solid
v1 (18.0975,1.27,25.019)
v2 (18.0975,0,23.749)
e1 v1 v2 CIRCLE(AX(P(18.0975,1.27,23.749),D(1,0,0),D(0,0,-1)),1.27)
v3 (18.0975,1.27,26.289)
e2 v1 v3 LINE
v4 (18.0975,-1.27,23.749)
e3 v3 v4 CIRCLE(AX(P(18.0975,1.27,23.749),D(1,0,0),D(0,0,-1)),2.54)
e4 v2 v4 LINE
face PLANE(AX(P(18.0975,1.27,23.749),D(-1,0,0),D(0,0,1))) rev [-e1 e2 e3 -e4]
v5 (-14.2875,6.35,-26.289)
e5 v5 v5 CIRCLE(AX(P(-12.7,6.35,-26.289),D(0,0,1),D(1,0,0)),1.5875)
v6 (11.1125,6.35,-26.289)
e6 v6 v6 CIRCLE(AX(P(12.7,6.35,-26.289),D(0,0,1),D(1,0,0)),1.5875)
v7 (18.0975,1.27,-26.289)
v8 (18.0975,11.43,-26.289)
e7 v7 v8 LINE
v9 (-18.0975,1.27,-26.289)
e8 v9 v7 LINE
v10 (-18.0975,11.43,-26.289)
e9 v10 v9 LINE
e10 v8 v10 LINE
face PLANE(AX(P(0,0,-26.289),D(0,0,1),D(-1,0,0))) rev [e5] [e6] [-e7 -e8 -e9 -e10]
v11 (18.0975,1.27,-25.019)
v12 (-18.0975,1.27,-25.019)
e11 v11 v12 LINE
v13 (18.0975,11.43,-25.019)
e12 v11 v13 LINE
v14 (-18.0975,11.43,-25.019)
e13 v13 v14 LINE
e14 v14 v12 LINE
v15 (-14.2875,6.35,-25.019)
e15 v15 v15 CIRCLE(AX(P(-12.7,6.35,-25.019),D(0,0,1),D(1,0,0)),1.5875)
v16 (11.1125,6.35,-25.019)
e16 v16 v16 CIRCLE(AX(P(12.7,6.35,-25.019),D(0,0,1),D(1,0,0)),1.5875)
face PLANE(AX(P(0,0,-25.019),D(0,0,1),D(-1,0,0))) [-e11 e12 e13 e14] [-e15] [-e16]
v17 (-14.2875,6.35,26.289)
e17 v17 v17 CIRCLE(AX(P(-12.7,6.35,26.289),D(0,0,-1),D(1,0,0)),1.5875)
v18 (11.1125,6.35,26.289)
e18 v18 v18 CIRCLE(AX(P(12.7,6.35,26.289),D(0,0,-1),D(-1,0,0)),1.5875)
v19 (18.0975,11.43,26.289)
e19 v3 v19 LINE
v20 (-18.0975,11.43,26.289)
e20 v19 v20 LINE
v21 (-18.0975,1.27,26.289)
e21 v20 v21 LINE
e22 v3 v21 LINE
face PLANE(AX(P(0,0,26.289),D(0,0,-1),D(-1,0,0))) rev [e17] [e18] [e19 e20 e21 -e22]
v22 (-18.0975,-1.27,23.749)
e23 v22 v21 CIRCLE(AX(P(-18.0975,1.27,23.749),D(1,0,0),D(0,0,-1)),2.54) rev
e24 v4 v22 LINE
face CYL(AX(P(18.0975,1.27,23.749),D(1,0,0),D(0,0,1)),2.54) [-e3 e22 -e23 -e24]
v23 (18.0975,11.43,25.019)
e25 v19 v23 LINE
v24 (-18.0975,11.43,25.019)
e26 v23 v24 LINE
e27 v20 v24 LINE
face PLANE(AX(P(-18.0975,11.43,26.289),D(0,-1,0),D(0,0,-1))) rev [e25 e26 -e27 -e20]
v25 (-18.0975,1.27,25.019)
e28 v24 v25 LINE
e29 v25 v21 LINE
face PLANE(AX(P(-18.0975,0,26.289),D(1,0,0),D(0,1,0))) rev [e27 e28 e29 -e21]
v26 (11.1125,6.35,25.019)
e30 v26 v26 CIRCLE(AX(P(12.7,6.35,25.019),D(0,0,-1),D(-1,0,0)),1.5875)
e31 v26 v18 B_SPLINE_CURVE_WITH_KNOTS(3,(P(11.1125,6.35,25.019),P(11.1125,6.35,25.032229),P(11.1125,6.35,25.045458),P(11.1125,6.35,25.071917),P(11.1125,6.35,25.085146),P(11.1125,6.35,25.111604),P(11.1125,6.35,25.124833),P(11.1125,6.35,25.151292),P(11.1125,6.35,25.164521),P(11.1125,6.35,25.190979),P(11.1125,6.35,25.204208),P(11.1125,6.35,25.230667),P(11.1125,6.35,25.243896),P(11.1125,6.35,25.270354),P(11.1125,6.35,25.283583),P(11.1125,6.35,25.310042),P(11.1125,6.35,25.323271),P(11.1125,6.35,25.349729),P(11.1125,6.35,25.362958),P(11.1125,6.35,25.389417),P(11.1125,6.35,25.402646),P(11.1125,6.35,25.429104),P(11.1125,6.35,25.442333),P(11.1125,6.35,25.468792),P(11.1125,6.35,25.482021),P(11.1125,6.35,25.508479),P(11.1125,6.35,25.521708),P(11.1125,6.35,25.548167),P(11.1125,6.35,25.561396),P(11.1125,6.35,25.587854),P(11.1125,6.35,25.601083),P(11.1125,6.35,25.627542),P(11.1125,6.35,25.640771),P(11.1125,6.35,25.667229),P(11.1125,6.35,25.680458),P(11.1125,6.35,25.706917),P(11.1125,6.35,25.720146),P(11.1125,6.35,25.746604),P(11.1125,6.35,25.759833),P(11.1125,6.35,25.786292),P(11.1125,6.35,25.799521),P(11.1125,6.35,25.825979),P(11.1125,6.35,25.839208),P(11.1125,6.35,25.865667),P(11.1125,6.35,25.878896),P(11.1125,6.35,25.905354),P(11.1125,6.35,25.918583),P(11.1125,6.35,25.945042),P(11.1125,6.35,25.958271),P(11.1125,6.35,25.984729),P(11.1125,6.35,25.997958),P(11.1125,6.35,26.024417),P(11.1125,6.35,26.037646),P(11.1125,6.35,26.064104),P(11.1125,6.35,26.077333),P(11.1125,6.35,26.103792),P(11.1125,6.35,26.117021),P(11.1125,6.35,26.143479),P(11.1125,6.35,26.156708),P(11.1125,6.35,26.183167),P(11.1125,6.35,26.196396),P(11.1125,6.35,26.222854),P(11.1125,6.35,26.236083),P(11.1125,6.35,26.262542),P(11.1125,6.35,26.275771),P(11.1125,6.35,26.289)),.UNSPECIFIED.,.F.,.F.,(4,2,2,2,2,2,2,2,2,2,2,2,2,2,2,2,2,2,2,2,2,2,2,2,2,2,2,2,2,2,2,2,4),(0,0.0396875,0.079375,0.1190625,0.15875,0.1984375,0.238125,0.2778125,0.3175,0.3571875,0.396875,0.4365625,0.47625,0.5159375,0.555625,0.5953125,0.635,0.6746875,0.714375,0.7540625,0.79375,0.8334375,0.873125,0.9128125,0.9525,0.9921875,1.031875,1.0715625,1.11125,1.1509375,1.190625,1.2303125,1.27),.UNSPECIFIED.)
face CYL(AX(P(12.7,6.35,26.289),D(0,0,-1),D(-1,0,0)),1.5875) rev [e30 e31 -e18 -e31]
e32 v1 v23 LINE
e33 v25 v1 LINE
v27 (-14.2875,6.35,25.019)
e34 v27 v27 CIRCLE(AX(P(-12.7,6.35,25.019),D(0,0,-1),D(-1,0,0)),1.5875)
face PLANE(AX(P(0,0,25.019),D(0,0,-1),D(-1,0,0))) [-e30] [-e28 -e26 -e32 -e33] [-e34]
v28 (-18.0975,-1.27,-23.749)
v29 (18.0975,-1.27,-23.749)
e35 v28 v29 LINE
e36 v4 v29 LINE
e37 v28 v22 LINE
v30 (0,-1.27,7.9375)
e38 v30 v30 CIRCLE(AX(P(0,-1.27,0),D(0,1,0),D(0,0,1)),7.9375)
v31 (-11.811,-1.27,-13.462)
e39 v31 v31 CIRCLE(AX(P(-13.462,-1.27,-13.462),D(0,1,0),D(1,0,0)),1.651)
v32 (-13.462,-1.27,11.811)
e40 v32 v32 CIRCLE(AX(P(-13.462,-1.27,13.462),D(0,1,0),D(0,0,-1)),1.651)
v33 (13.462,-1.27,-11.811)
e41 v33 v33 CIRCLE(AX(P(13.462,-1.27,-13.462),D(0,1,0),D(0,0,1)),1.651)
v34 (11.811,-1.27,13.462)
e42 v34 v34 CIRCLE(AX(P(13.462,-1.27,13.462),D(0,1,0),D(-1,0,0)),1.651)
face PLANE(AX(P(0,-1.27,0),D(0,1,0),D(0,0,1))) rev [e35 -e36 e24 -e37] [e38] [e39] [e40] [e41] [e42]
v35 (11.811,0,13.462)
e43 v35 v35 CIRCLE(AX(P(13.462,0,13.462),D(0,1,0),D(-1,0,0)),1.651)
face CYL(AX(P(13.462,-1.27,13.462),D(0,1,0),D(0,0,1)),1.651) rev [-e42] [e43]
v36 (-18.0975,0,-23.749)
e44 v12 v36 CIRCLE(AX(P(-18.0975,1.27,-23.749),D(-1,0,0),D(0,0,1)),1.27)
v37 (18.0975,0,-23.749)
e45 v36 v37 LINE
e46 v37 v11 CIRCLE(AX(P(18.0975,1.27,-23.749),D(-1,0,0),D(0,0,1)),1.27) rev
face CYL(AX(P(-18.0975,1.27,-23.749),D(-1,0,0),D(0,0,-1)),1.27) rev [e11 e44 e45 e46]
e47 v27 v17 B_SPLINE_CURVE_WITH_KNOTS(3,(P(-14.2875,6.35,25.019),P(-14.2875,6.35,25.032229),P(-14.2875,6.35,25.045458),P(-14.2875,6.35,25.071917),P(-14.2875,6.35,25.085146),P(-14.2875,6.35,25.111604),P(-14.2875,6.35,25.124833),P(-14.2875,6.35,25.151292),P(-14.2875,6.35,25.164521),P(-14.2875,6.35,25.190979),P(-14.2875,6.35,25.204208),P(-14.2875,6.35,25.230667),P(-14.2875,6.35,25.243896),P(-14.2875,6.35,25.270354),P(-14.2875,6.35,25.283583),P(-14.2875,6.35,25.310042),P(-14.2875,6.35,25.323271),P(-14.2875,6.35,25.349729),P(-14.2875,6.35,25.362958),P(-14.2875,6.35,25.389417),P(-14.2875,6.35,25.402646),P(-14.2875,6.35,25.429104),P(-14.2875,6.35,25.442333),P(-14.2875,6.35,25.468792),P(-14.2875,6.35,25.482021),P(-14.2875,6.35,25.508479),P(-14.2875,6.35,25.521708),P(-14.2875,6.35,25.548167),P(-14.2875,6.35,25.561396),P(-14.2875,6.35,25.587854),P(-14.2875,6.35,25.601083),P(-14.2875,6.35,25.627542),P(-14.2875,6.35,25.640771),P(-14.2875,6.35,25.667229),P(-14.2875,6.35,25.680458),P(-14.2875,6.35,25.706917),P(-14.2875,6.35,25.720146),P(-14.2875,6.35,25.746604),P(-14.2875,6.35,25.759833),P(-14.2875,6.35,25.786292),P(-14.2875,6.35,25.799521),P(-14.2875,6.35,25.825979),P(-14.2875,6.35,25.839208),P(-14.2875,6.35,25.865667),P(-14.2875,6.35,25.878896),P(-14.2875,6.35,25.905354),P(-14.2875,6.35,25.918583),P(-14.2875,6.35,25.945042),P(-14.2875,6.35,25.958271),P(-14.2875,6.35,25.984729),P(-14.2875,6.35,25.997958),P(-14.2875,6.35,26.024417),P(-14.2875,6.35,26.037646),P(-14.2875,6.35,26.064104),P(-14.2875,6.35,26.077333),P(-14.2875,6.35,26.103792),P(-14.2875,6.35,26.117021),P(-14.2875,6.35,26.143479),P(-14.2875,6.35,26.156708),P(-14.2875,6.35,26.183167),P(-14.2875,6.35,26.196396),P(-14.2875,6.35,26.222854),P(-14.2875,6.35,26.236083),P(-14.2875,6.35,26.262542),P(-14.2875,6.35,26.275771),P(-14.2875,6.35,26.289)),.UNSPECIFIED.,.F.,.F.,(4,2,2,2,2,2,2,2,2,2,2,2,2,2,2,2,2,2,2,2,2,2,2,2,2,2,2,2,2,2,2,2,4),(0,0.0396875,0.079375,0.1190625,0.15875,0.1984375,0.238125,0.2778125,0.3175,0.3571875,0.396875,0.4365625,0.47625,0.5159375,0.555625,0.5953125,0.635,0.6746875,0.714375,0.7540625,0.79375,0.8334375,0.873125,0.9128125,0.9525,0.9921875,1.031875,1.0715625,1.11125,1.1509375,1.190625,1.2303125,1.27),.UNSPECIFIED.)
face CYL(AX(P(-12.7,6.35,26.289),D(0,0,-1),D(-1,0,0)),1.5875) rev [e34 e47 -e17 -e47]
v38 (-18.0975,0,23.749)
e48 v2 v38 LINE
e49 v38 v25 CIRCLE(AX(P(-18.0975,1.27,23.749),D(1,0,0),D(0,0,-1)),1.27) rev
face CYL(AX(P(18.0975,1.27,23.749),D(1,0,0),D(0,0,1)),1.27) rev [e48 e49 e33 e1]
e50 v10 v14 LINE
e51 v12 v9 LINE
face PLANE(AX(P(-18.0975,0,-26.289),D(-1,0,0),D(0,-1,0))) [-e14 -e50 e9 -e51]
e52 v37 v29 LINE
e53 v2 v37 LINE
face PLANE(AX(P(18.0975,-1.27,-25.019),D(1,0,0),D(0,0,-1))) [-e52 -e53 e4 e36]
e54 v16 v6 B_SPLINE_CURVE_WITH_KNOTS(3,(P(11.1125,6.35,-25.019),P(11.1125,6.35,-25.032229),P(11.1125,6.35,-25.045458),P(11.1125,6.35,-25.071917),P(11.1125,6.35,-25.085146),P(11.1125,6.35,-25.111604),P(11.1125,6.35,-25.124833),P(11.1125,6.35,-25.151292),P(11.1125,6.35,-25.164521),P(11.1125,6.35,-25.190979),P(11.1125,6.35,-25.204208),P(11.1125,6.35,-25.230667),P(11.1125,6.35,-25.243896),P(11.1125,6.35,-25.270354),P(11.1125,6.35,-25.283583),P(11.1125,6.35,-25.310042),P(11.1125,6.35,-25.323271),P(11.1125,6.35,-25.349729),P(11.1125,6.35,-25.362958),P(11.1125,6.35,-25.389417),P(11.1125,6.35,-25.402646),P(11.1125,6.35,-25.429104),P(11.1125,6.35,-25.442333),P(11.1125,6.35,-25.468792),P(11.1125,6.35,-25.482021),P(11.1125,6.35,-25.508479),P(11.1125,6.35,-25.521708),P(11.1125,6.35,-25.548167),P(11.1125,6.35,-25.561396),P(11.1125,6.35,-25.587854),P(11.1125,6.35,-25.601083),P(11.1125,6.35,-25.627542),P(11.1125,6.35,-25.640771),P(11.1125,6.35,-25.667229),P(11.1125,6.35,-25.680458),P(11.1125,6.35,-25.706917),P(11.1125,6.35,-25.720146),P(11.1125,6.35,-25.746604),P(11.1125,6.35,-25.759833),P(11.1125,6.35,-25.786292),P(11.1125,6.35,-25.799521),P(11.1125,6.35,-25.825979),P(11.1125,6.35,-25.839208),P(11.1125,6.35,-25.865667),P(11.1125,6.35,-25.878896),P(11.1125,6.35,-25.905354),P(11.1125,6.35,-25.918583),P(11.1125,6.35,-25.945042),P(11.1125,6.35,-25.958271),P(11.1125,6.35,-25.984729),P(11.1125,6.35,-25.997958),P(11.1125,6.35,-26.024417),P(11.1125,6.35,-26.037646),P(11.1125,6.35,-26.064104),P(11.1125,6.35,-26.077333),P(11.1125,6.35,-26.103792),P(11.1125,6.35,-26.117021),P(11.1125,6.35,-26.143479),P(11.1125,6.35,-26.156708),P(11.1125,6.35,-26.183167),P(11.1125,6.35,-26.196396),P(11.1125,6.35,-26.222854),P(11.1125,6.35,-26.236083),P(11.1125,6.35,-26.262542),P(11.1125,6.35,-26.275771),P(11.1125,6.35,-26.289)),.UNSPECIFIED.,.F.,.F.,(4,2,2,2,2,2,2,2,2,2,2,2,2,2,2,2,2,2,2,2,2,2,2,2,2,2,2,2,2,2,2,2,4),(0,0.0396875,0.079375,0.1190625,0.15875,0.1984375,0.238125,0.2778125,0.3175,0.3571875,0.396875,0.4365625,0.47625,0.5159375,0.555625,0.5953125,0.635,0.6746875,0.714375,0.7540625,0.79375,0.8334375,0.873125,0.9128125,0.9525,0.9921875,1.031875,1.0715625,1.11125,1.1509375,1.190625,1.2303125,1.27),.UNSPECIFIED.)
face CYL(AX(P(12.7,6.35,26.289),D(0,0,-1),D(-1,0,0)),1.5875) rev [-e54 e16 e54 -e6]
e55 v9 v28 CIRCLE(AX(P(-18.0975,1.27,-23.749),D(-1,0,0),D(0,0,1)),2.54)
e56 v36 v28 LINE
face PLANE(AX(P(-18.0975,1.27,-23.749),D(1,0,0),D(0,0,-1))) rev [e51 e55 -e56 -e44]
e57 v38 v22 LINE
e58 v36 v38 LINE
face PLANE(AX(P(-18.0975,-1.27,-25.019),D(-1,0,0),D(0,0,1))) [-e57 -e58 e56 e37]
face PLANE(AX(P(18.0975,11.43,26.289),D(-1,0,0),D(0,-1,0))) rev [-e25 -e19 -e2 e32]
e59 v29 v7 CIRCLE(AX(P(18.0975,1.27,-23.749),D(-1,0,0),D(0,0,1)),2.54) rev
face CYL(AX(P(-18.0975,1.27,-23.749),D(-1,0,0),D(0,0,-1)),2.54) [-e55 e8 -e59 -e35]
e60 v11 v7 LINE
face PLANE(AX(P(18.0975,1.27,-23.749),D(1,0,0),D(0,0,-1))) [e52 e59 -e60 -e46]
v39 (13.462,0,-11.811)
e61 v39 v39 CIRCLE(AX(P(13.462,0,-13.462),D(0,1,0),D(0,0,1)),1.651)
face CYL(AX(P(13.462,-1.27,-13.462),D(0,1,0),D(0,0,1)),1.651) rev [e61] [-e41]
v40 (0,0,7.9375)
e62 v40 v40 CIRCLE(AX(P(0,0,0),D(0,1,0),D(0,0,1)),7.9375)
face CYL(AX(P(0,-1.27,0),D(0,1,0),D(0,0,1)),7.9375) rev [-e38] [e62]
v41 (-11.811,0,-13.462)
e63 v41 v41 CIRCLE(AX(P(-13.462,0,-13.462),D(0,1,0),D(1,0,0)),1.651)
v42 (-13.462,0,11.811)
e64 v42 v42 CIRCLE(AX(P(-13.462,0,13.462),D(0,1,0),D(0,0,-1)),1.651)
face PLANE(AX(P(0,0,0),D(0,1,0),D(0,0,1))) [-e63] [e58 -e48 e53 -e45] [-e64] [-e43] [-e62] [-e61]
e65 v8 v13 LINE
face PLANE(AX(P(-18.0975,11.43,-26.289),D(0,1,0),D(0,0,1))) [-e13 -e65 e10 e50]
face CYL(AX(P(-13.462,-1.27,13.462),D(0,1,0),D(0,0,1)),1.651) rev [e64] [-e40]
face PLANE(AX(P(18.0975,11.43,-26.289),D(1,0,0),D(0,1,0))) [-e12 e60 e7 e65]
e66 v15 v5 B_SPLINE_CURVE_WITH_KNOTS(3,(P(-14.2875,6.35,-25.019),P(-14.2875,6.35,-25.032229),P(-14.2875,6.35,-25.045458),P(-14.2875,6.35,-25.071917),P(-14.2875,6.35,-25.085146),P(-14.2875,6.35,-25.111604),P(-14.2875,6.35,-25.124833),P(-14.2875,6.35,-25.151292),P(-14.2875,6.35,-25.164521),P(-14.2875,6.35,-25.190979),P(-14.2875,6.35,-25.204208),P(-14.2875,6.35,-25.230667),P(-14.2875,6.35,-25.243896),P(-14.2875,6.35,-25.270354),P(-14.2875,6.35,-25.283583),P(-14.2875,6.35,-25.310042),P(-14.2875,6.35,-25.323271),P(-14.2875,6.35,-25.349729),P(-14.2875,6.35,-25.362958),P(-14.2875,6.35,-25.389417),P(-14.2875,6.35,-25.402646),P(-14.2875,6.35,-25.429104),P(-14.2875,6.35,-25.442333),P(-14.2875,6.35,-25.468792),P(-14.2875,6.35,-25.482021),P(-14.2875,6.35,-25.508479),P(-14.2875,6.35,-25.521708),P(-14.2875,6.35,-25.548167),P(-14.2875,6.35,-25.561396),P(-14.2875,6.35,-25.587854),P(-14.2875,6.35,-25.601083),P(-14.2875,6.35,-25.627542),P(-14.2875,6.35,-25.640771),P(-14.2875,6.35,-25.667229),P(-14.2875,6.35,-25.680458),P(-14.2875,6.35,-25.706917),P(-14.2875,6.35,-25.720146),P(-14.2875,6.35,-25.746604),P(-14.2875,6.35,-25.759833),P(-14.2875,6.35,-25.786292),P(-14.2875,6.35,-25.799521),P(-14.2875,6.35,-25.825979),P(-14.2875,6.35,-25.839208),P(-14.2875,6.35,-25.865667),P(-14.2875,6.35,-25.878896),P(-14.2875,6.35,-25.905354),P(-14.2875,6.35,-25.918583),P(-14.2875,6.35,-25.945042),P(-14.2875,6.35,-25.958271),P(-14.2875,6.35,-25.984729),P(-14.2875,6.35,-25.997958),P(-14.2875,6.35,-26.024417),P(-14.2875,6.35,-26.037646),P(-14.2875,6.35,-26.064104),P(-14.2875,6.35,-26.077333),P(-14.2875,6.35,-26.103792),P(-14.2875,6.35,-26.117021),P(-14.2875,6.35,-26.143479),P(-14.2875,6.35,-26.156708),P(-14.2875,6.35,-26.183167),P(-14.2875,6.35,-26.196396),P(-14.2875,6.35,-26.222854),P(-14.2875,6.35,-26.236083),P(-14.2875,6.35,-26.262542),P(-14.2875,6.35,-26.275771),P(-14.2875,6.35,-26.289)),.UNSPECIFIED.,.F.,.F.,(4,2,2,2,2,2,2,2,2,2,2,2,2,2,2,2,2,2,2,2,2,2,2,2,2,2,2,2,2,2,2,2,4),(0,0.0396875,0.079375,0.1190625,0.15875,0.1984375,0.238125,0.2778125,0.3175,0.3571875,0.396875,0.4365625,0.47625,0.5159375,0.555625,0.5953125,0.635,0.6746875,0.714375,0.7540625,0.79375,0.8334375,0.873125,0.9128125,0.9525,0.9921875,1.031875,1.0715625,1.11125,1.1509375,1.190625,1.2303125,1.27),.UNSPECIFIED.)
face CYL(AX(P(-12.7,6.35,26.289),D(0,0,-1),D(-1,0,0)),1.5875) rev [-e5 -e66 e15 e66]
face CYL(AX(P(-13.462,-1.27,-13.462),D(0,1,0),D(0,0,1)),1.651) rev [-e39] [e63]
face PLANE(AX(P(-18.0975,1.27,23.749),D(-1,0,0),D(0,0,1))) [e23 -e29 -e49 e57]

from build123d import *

# Parameters (mm, degrees)
SKETCH1_W                    = 36.195
SKETCH1_H                    = 50.038
SKETCH1_R                    = 7.9375
BASE_FLANGE1_DEPTH           = 1.27
EDGE_FLANGE1_STRIP_W         = 7.62
EDGE_FLANGE1_STRIP_H         = 1.27
EDGE_FLANGE1_STRIP_CUT_DEPTH = 36.195
EDGE_FLANGE1_DEPTH           = 36.195
SKETCH9_R                    = 1.651
CUT_EXTRUDE1_DEPTH           = 34.900972364
CUT_EXTRUDE2_DEPTH           = 57.768041099
CUT_EXTRUDE2_DEPTH_BACK      = 57.768041099
SKETCH10_R                   = 1.5875
CIRPATTERN2_COUNT            = 4


# Sheet-metal steps are written as plain solids
with BuildPart() as part:
    # Sketch1 → Base-Flange1 (new body)
    with BuildSketch(Plane(origin=(0, 0, 0), x_dir=(1, 0, 0), z_dir=(0, 1, 0))):
        Rectangle(SKETCH1_W, SKETCH1_H)
        with Locations(Location((0, 0, 0), (0, 0, 270))):
            Circle(SKETCH1_R, mode=Mode.SUBTRACT)
    extrude(amount=-BASE_FLANGE1_DEPTH)

    # Edge-Flange1 strip (across the edge) → Edge-Flange1 strip cut (cut)
    with BuildSketch(Plane(origin=(-18.0975, 0, 25.019), x_dir=(0, 0, -1), z_dir=(1, 0, 0))):
        with Locations((-2.54, -0.635)):
            Rectangle(EDGE_FLANGE1_STRIP_W, EDGE_FLANGE1_STRIP_H)
    edge_flange1_strip_cut = extrude(amount=EDGE_FLANGE1_STRIP_CUT_DEPTH, mode=Mode.SUBTRACT)

    # Edge-Flange1 section (across the edge) → Edge-Flange1 (add)
    with BuildSketch(Plane(origin=(-18.0975, 0, 25.019), x_dir=(0, 0, -1), z_dir=(1, 0, 0))):
        with BuildLine():
            Line((-1.27, 1.27), (-1.27, 11.43))
            Line((-1.27, 11.43), (0, 11.43))
            Line((0, 11.43), (0, 1.27))
            ThreePointArc((0, 1.27), (0.371974388, 0.371974388), (1.27, 0))
            Line((1.27, 0), (1.27, -1.27))
            ThreePointArc((1.27, -1.27), (-0.526051224, -0.526051224), (-1.27, 1.27))
        make_face()
    edge_flange1 = extrude(amount=EDGE_FLANGE1_DEPTH)

    # Mirror1: Edge-Flange1 strip cut, Edge-Flange1 across plane
    add(edge_flange1_strip_cut.mirror(Plane.XY), mode=Mode.SUBTRACT)
    add(edge_flange1.mirror(Plane.XY))

    # Sketch9 → Cut-Extrude1 (cut, through all)
    with BuildSketch(Plane(origin=(0, 0, 0), x_dir=(1, 0, 0), z_dir=(0, 1, 0))):
        with Locations(Location((13.462, 13.462, 0), (0, 0, 270))):
            Circle(SKETCH9_R)
    cut_extrude1 = extrude(amount=-CUT_EXTRUDE1_DEPTH, mode=Mode.SUBTRACT)

    # Sketch10 → Cut-Extrude2 (cut, two sides: drawn at the far end of the back side and taken through both)
    with BuildSketch(Plane(origin=(0, 0, -26.289), x_dir=(-1, 0, 0), z_dir=(0, 0, -1)).offset(-CUT_EXTRUDE2_DEPTH_BACK)):
        with Locations((-12.7, 6.35)):
            Circle(SKETCH10_R)
        with Locations((12.7, 6.35)):
            Circle(SKETCH10_R)
    extrude(amount=CUT_EXTRUDE2_DEPTH + CUT_EXTRUDE2_DEPTH_BACK, mode=Mode.SUBTRACT)

    # CirPattern2: Cut-Extrude1 ×4 about axis
    cirpattern2_axis = Axis((0, 0, 0), (0, 1, 0))
    for i in range(1, CIRPATTERN2_COUNT):
        add(cut_extrude1.rotate(cirpattern2_axis, i * 360 / CIRPATTERN2_COUNT), mode=Mode.SUBTRACT)


solid = part.part
